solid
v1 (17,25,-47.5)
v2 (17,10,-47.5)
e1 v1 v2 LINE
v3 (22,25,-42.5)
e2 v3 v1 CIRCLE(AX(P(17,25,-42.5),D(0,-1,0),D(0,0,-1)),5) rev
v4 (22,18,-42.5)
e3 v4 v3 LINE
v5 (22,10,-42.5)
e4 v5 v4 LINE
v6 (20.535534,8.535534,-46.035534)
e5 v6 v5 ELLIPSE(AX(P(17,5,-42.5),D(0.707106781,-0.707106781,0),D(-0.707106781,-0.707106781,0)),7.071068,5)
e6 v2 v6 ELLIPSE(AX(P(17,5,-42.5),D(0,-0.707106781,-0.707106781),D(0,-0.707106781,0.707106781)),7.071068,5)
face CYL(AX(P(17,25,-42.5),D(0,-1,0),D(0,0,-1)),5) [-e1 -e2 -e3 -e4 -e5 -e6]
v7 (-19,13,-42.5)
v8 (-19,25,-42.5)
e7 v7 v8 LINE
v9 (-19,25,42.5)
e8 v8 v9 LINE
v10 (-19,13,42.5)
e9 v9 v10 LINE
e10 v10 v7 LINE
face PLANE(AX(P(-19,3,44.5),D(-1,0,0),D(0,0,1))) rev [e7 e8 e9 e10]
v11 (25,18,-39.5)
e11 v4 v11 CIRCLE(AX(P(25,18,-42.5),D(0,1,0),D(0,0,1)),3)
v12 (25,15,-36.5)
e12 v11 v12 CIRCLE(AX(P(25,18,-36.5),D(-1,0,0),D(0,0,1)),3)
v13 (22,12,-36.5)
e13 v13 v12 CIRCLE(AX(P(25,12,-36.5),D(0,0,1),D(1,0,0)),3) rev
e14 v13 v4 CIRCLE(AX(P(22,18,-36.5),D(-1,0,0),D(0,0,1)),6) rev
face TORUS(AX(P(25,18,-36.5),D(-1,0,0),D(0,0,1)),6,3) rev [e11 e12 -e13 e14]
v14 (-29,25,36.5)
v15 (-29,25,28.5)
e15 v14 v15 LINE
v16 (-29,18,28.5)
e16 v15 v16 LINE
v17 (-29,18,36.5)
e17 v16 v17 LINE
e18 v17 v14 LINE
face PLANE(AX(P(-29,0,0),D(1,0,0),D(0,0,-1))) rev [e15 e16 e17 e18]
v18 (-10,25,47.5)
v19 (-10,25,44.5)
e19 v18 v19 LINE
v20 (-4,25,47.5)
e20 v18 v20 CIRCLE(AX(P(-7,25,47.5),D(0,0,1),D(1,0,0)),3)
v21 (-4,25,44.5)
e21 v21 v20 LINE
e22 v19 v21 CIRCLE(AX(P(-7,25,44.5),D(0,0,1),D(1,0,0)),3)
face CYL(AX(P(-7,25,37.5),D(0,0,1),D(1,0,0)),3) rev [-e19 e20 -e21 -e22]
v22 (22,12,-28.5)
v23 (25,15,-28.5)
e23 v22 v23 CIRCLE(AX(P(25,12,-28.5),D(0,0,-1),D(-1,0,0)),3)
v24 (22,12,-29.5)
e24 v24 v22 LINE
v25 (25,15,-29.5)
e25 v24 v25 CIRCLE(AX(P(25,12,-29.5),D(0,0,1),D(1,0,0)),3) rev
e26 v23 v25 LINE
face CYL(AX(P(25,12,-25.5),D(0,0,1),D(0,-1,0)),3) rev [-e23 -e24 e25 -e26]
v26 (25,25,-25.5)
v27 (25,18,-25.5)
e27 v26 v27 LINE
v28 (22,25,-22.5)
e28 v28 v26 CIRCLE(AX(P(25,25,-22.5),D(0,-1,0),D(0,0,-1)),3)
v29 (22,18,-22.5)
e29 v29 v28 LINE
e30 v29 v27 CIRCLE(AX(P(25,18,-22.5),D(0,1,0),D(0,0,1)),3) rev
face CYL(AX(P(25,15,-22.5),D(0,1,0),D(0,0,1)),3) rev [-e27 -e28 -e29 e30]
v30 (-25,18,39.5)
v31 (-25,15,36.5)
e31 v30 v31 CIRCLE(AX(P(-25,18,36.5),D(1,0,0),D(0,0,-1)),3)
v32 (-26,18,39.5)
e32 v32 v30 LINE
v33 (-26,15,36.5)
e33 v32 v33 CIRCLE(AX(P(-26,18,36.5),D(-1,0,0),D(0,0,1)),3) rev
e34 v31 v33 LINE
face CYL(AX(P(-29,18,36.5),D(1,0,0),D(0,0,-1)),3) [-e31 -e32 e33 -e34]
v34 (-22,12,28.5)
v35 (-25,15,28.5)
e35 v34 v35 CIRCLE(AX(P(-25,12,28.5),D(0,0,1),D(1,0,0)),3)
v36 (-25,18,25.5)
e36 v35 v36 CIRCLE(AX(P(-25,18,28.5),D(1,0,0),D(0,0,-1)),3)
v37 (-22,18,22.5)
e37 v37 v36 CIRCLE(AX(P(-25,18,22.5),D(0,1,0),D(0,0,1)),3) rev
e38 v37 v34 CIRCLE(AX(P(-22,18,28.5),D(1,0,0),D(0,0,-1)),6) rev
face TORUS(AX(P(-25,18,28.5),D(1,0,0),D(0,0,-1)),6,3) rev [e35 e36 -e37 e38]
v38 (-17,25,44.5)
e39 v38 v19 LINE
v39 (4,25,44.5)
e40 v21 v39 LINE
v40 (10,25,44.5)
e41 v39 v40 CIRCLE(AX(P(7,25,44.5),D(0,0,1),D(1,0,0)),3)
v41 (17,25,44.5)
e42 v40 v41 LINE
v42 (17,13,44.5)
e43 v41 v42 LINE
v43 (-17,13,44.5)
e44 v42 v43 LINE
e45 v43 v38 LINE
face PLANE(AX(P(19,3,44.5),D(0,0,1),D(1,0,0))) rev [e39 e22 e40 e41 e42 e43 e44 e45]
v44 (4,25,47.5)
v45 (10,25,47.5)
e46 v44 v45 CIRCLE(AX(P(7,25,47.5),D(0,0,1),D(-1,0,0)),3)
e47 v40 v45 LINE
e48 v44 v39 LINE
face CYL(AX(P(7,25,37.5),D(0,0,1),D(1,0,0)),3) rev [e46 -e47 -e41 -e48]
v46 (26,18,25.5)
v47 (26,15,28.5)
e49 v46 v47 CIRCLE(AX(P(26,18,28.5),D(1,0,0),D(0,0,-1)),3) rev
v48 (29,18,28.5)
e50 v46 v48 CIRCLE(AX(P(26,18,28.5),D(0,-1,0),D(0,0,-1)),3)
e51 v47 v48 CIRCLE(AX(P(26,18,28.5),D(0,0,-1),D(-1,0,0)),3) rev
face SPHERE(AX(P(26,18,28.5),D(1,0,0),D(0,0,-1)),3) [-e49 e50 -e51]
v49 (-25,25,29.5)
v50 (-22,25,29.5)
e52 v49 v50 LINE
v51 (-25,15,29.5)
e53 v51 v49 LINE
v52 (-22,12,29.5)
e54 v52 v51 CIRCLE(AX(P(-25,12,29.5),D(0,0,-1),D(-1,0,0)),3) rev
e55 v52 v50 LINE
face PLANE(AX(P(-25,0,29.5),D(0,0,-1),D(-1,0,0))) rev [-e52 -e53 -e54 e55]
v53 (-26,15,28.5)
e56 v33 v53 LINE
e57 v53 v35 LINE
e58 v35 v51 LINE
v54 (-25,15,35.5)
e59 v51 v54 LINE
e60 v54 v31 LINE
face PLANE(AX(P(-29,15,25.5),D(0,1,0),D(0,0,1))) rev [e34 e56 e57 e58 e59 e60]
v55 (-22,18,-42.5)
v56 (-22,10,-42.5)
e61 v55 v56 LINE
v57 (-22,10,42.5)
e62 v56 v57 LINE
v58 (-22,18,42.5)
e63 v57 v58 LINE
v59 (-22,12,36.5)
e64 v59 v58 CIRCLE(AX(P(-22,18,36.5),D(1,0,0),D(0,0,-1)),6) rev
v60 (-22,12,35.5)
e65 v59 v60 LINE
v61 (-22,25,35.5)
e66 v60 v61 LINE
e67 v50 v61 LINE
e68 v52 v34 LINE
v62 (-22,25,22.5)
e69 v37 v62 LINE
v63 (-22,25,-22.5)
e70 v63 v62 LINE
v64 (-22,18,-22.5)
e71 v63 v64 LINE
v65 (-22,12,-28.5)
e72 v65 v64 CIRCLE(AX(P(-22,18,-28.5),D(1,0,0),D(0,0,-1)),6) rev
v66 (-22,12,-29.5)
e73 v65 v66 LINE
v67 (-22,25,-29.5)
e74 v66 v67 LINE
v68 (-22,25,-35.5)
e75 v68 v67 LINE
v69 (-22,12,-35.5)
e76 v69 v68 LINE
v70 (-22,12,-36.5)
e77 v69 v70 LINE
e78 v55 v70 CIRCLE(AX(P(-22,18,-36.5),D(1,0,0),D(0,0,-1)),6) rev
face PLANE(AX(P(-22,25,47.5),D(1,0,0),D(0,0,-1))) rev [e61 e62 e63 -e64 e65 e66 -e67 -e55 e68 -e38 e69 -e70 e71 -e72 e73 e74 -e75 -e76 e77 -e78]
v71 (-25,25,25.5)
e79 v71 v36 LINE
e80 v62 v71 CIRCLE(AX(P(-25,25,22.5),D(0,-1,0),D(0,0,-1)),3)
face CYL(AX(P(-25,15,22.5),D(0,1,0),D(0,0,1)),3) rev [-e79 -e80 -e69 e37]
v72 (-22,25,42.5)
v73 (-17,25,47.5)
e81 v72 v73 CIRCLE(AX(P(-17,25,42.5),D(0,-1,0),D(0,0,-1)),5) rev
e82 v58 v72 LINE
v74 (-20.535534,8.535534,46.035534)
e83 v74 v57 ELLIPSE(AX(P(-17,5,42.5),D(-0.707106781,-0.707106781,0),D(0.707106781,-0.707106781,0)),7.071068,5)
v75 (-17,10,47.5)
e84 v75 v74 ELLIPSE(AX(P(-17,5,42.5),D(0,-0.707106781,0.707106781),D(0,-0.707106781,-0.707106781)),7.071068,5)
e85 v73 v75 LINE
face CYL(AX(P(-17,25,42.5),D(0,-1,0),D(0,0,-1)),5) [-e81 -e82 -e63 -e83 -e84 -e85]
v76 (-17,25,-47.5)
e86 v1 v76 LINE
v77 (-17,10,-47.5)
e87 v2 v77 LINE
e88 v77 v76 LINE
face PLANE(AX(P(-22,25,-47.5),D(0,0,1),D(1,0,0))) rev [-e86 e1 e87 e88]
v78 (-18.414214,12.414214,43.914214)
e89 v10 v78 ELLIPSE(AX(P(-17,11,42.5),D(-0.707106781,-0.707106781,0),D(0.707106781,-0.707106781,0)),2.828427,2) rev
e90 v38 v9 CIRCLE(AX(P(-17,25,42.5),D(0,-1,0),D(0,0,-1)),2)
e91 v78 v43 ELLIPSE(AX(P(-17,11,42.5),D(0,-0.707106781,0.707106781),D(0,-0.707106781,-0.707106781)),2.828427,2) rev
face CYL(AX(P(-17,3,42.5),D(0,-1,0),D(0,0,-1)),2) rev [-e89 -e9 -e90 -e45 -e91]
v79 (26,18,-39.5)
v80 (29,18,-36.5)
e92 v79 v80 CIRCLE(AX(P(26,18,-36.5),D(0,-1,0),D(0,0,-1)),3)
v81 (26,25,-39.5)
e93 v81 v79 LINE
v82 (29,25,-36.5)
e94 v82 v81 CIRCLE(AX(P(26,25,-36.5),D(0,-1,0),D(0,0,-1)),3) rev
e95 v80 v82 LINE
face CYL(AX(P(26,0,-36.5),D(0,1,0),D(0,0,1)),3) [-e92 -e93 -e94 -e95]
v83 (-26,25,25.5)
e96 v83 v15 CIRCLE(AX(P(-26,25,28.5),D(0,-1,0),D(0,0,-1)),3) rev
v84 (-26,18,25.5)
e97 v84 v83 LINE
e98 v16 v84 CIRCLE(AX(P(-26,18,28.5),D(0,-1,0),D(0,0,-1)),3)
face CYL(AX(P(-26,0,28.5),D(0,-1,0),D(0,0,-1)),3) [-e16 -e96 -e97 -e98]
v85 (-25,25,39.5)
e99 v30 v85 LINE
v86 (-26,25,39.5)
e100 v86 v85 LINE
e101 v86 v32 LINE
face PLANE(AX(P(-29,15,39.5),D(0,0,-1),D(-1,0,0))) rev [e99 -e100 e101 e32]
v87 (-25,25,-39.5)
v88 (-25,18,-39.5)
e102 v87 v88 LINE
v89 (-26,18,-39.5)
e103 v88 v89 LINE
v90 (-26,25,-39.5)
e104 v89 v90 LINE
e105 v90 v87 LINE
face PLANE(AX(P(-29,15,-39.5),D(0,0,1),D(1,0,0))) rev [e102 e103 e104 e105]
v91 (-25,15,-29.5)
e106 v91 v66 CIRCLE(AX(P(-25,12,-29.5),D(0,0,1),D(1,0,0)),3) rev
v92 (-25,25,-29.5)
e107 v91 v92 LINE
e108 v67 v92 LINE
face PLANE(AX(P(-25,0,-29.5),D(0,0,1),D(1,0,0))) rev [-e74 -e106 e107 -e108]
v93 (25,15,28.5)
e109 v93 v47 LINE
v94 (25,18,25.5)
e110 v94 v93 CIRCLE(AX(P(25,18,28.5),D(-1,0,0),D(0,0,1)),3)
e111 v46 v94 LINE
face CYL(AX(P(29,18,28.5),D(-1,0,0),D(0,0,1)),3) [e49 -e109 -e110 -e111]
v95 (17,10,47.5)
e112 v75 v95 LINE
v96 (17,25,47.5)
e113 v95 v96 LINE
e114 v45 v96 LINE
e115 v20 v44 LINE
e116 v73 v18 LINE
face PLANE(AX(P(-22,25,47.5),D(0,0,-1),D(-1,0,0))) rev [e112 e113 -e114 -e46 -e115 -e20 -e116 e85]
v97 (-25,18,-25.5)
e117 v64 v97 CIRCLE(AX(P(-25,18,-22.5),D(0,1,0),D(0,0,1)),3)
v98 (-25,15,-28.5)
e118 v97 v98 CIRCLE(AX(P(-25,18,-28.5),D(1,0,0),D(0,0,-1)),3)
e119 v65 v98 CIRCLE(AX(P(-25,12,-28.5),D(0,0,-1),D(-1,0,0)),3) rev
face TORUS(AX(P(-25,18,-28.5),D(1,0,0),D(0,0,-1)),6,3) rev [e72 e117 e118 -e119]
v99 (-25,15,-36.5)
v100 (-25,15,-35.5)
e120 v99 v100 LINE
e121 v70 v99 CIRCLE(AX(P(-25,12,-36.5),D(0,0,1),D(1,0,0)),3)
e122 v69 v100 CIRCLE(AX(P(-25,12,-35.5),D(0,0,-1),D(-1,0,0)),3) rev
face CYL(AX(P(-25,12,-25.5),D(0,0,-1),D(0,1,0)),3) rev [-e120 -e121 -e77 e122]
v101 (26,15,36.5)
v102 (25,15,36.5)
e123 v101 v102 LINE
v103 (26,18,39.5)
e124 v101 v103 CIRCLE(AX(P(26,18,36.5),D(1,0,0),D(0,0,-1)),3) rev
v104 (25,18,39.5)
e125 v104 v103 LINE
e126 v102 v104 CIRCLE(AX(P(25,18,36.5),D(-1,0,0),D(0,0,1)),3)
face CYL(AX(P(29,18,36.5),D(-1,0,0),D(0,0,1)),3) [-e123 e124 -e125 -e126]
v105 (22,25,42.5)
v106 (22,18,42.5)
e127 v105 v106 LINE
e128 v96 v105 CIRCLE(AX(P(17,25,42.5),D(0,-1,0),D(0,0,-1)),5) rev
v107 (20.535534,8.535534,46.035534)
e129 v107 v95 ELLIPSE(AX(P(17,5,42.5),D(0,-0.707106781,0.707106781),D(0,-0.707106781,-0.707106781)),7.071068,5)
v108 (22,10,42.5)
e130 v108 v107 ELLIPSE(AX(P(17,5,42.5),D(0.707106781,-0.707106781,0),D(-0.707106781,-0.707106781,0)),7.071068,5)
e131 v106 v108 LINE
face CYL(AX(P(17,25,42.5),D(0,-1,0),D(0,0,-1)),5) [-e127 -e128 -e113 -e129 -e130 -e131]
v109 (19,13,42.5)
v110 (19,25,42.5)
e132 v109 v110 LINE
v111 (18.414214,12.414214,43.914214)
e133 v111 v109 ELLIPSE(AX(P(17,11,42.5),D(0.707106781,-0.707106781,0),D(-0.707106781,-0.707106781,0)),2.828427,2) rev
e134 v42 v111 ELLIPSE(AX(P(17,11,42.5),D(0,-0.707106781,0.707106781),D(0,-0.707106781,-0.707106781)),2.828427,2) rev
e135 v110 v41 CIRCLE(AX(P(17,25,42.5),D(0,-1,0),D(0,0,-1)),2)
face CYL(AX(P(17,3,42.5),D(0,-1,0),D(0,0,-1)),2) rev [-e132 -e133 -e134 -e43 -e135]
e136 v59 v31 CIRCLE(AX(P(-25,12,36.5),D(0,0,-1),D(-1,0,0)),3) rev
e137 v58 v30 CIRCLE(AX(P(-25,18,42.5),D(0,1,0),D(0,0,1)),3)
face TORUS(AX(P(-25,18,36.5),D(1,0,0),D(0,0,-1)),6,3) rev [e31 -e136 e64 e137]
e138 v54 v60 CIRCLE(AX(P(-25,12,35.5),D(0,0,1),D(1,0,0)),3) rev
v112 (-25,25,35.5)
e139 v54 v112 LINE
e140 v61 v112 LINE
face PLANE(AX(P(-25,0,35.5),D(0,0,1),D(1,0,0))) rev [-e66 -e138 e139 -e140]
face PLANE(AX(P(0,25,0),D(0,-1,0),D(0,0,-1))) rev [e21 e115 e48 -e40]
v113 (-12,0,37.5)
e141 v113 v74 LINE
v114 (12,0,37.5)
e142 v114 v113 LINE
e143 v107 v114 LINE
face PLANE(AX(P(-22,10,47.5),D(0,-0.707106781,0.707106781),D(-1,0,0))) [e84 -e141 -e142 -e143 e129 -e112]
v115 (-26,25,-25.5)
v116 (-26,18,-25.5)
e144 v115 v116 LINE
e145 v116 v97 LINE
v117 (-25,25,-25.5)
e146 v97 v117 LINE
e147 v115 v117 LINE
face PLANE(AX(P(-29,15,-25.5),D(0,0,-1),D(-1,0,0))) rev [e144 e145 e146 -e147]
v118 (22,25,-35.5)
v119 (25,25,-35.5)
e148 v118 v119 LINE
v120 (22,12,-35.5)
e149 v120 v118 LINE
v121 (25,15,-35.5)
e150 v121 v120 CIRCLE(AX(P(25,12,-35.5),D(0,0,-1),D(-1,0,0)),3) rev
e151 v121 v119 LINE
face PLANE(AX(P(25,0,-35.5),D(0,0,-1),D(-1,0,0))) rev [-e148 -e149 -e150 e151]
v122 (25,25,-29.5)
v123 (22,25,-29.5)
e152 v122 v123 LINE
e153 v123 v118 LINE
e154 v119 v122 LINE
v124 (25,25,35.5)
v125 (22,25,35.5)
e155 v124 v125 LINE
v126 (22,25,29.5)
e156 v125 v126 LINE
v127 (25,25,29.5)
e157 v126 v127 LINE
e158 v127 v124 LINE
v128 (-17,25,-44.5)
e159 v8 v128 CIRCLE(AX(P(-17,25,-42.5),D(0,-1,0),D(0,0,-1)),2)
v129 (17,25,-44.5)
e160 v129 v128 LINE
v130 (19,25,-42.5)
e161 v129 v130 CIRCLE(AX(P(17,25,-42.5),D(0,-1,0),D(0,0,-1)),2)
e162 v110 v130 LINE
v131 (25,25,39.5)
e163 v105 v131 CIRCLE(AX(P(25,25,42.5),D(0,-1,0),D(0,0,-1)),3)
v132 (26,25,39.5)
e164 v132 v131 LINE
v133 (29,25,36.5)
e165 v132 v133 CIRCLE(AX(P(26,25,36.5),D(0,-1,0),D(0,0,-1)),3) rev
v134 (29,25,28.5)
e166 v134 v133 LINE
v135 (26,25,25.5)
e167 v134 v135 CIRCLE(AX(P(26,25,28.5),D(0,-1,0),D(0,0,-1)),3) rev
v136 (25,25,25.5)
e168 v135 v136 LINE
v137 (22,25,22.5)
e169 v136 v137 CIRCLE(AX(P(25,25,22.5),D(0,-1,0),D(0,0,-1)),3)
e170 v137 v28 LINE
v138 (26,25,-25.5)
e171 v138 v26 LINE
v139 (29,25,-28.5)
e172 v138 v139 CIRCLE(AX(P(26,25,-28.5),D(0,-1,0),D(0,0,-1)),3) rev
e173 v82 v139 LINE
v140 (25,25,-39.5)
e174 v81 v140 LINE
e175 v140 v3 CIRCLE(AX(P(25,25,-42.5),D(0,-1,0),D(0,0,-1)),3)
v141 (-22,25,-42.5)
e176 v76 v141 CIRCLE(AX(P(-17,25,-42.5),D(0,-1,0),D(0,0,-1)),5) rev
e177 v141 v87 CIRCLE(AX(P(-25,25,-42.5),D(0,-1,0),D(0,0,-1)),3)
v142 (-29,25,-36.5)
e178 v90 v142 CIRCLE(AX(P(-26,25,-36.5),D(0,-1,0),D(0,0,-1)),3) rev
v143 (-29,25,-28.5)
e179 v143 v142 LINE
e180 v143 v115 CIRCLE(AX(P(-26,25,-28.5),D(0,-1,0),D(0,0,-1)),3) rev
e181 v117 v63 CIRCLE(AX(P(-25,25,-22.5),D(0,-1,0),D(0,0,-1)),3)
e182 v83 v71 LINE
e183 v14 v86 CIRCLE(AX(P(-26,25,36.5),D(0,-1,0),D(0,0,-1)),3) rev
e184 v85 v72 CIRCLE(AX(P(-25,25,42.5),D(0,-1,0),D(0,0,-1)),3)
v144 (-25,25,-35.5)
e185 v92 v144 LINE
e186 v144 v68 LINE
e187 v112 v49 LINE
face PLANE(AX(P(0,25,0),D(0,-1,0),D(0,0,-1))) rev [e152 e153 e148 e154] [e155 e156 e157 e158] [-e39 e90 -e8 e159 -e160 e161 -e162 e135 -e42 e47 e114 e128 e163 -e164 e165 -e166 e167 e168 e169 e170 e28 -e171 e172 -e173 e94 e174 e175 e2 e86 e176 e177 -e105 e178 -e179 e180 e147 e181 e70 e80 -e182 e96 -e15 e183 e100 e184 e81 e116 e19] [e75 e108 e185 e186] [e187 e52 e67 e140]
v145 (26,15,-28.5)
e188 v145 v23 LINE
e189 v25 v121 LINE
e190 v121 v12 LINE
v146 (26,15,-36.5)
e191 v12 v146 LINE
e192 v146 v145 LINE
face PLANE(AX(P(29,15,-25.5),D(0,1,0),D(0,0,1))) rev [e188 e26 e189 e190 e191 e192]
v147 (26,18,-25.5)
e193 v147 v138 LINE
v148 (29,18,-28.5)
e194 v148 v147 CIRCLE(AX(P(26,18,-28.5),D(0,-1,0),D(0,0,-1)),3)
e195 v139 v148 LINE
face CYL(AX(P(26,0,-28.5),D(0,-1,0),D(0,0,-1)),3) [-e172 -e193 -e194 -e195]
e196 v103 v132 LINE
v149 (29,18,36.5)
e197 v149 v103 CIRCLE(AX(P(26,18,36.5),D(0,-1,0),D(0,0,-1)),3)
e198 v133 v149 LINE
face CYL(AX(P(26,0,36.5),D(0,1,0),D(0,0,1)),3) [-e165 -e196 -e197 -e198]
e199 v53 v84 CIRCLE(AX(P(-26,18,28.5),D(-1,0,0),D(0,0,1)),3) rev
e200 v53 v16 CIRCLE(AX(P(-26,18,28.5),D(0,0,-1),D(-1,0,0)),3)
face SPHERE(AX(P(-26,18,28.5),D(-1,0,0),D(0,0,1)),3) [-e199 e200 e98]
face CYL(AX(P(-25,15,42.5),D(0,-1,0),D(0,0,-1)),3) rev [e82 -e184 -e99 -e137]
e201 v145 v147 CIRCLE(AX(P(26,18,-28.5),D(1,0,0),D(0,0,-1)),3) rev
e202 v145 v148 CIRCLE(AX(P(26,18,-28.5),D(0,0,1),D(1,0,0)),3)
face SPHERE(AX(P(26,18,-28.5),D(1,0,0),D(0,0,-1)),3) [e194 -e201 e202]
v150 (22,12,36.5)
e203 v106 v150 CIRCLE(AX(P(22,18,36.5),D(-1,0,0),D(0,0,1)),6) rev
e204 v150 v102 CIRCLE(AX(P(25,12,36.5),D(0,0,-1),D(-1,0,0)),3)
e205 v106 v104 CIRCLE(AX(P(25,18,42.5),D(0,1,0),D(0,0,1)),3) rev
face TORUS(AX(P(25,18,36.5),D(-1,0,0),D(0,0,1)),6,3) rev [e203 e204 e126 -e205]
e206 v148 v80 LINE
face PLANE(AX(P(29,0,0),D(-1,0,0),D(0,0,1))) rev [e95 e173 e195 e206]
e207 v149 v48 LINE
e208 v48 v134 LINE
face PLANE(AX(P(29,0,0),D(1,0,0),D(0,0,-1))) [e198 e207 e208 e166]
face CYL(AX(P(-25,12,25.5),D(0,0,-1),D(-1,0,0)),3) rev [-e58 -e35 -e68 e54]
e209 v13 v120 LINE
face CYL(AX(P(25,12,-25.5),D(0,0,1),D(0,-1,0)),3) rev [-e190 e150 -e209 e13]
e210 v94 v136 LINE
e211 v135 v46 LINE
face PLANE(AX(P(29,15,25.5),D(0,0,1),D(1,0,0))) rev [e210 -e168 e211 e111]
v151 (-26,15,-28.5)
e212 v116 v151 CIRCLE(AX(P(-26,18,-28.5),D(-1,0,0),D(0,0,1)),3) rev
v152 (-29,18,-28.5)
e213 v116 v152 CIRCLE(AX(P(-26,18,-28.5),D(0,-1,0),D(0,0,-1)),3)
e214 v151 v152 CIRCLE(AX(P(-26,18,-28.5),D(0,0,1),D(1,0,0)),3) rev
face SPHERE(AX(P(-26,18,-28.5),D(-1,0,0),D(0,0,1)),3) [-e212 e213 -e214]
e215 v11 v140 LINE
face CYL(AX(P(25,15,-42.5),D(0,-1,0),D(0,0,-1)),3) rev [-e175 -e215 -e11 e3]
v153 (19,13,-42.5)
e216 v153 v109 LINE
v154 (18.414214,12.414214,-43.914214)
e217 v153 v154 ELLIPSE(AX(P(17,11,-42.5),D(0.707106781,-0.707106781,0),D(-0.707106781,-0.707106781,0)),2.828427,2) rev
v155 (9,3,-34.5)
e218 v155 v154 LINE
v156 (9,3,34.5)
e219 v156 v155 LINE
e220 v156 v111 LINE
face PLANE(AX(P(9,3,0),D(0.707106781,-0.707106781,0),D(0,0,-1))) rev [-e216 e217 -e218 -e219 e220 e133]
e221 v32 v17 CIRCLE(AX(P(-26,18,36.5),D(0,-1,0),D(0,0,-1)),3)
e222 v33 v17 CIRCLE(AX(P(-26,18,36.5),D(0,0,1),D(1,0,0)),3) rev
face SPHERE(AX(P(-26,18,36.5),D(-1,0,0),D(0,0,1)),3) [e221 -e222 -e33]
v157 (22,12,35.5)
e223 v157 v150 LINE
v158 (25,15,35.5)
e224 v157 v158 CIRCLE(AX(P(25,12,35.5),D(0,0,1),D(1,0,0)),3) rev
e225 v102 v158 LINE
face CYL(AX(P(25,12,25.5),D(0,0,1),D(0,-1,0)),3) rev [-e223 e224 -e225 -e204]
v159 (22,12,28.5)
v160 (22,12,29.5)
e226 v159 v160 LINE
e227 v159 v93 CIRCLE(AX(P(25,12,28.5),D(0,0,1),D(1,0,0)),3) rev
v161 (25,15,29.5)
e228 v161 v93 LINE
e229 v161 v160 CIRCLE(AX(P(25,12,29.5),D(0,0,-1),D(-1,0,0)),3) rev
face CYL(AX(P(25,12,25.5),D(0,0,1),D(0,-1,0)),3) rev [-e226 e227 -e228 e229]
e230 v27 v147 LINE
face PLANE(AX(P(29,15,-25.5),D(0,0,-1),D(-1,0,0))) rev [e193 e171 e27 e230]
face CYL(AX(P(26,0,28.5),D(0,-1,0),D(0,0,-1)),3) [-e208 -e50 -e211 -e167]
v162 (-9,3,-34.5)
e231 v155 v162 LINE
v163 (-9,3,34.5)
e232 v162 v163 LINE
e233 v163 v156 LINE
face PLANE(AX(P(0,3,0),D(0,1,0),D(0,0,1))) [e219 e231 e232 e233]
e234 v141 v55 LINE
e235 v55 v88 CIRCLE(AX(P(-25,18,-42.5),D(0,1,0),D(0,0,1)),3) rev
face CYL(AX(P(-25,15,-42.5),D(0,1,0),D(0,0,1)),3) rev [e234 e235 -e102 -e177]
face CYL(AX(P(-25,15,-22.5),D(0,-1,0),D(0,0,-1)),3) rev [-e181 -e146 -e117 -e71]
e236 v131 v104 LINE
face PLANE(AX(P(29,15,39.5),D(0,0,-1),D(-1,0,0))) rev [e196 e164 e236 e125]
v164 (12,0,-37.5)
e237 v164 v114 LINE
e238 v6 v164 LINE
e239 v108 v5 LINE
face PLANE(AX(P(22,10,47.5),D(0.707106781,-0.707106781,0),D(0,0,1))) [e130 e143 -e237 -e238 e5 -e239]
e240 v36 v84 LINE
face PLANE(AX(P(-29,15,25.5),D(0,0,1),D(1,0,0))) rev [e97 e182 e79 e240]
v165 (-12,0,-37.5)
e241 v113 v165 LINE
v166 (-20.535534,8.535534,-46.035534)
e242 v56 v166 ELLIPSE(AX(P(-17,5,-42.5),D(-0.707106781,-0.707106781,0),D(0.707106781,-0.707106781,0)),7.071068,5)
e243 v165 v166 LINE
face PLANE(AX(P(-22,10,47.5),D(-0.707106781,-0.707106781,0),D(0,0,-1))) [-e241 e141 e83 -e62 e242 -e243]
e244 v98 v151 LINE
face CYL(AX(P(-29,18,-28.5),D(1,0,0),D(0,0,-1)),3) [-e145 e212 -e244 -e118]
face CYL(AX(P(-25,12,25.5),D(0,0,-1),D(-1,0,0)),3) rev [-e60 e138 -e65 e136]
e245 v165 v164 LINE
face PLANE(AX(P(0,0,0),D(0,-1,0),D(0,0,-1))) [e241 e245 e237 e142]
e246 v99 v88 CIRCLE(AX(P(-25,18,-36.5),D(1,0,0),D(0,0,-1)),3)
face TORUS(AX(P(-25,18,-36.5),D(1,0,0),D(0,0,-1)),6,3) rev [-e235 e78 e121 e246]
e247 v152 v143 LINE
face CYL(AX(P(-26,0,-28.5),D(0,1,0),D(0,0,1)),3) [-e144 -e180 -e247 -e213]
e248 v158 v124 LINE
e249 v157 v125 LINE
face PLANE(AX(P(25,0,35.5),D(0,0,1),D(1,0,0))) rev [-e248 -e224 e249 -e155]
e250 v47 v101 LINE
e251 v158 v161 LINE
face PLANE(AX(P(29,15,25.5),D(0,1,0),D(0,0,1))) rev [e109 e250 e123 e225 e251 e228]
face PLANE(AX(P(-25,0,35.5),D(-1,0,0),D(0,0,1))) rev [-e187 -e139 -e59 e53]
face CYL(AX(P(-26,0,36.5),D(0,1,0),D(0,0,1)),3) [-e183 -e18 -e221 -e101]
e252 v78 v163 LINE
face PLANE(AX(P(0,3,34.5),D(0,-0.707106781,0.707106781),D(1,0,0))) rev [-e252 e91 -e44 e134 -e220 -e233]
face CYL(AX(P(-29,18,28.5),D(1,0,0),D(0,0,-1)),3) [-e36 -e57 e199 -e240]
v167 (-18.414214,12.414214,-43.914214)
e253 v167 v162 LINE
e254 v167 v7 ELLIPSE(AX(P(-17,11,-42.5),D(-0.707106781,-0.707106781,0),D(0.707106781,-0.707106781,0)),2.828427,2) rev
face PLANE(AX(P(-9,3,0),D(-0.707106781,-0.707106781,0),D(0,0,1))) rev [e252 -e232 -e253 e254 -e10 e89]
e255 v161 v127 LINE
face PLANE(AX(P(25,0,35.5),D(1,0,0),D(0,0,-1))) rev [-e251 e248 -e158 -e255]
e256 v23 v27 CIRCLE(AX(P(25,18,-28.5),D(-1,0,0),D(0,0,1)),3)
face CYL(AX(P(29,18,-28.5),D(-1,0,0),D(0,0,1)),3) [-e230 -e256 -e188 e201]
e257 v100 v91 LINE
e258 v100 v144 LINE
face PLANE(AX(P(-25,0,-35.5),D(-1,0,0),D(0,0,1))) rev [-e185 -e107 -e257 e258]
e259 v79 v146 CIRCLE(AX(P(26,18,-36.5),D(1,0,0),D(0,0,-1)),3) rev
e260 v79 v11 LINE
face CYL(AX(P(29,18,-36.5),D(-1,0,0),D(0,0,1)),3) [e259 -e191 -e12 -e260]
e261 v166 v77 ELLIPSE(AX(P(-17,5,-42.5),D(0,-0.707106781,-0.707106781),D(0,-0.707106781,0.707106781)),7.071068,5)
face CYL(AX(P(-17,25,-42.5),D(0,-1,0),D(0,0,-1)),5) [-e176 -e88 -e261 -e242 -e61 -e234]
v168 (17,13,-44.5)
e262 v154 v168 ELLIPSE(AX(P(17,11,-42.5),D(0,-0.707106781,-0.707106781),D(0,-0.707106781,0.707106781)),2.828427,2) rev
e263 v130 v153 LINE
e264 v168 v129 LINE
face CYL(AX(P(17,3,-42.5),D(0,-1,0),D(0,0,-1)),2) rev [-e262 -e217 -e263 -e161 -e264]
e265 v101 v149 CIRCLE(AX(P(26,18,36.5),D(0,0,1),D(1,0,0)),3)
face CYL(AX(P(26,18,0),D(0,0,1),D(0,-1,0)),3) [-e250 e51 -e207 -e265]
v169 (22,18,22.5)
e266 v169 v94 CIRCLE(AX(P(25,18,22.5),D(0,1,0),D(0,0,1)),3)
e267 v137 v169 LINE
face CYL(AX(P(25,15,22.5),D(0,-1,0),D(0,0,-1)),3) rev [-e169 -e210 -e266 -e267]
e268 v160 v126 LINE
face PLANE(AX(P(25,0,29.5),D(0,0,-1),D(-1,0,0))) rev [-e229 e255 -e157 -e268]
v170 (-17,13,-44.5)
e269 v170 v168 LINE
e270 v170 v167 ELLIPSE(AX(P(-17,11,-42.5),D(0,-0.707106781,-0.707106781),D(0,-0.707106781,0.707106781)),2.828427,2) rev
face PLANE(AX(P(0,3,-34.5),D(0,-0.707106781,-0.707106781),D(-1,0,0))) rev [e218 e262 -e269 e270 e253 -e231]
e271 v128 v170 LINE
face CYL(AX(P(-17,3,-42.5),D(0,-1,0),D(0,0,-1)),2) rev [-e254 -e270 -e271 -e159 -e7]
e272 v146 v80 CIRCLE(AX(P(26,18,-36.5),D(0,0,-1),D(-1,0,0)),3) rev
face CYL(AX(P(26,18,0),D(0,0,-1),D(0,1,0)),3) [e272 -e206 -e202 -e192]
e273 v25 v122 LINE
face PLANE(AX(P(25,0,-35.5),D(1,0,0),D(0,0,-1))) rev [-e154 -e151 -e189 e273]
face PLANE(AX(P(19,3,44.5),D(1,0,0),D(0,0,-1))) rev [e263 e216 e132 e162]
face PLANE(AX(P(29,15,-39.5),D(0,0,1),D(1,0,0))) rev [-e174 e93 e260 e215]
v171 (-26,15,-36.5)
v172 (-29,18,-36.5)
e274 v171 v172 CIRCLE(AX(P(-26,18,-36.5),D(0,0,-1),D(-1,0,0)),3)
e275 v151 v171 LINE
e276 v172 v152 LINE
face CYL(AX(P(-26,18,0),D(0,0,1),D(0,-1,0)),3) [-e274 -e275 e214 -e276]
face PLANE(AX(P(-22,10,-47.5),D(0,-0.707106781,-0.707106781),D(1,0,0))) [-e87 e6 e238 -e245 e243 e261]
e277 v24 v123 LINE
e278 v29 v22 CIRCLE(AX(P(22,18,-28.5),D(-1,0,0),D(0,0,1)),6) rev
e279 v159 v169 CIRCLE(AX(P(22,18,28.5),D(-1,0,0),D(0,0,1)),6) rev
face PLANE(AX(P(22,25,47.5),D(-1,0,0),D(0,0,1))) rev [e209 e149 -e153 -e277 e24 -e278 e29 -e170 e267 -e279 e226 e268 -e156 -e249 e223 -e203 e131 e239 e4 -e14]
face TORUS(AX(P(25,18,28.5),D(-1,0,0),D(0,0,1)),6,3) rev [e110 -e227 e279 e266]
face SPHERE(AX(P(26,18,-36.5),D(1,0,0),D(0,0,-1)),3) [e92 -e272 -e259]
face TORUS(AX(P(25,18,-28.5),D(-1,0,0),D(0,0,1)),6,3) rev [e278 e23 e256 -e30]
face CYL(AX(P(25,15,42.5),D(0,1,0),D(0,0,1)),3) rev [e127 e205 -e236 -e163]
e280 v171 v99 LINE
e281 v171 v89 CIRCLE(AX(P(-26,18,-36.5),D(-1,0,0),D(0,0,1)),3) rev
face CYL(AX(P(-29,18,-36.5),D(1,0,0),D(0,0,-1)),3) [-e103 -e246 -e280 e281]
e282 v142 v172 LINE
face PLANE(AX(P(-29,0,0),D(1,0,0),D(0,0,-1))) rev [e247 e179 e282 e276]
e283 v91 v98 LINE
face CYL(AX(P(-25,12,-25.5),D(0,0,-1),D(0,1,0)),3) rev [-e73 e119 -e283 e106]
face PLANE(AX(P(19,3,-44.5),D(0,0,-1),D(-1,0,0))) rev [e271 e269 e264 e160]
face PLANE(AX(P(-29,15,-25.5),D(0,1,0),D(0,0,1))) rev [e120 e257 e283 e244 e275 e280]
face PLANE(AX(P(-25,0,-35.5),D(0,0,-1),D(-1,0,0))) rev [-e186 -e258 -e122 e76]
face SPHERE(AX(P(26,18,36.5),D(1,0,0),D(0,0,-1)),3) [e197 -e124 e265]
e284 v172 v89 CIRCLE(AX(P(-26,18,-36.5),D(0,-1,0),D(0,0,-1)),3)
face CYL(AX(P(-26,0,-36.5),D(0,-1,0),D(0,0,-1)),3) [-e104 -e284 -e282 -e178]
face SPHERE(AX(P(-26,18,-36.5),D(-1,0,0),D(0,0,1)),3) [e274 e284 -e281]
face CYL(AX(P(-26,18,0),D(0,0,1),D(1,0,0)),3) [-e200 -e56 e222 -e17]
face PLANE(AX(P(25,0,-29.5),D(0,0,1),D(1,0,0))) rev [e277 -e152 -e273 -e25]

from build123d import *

# Parameters (mm, degrees)
SKETCH1_W               = 44
SKETCH1_H               = 95
BOSS_EXTRUDE1_DEPTH     = 25
SKETCH2_W               = 38
SKETCH2_H               = 89
CUT_EXTRUDE1_DEPTH      = 22
CHAMFER1_SIZE           = 10
FILLET1_R               = 2
FILLET2_R               = 5
SKETCH3_W               = 14
SKETCH3_H               = 10
BOSS_EXTRUDE2_DEPTH     = 7
SKETCH5_W               = 14
SKETCH5_H               = 10
BOSS_EXTRUDE3_DEPTH     = 7
FILLET3_R               = 3
CUT_EXTRUDE2_DEPTH      = 62.010245041
CUT_EXTRUDE2_DEPTH_BACK = 62.010245041
SKETCH7_W               = 3
SKETCH7_H               = 6
SKETCH8_R               = 3
CUT_EXTRUDE3_DEPTH      = 10


with BuildPart() as part:
    # Sketch1 → Boss-Extrude1 (new body)
    with BuildSketch(Plane(origin=(0, 0, 0), x_dir=(1, 0, 0), z_dir=(0, 1, 0))):
        Rectangle(SKETCH1_W, SKETCH1_H)
    extrude(amount=BOSS_EXTRUDE1_DEPTH)

    # Sketch2 → Cut-Extrude1 (cut)
    with BuildSketch(Plane(origin=(0, 25, 0), x_dir=(1, 0, 0), z_dir=(0, 1, 0))):
        Rectangle(SKETCH2_W, SKETCH2_H)
    extrude(amount=-CUT_EXTRUDE1_DEPTH, mode=Mode.SUBTRACT)

    # Chamfer1
    chamfer1_edges = [part.edges().sort_by_distance(p)[0] for p in [
        (-19, 3, 0),
        (0, 3, -44.5),
        (19, 3, 0),
        (0, 3, 44.5),
        (0, 0, 47.5),
        (-22, 0, 0),
        (0, 0, -47.5),
        (22, 0, 0),
    ]]
    chamfer(chamfer1_edges, length=CHAMFER1_SIZE)

    # Fillet1
    fillet1_edges = [part.edges().sort_by_distance(p)[0] for p in [
        (-19, 19, -44.5),
        (19, 19, -44.5),
        (19, 19, 44.5),
        (-19, 19, 44.5),
    ]]
    fillet(fillet1_edges, radius=FILLET1_R)

    # Fillet2
    fillet2_edges = [part.edges().sort_by_distance(p)[0] for p in [
        (22, 17.5, 47.5),
        (-22, 17.5, 47.5),
        (-22, 17.5, -47.5),
        (22, 17.5, -47.5),
    ]]
    fillet(fillet2_edges, radius=FILLET2_R)

    # Sketch3 → Boss-Extrude2 (add)
    with BuildSketch(Plane(origin=(22, 0, 0), x_dir=(0, 0, -1), z_dir=(1, 0, 0))):
        with Locations((-32.5, 20)):
            Rectangle(SKETCH3_W, SKETCH3_H)
        with Locations((32.5, 20)):
            Rectangle(SKETCH3_W, SKETCH3_H)
    extrude(amount=BOSS_EXTRUDE2_DEPTH)

    # Sketch5 → Boss-Extrude3 (add)
    with BuildSketch(Plane.ZY.offset(22)):
        with Locations((32.5, 20)):
            Rectangle(SKETCH5_W, SKETCH5_H)
        with Locations((-32.5, 20)):
            Rectangle(SKETCH5_W, SKETCH5_H)
    extrude(amount=BOSS_EXTRUDE3_DEPTH)

    # Fillet3
    fillet3_edges = [part.edges().sort_by_distance(p)[0] for p in [
        (22, 20, 39.5),
        (22, 15, 32.5),
        (25.5, 15, 39.5),
        (22, 20, 25.5),
        (25.5, 15, 25.5),
        (29, 20, 39.5),
        (29, 15, 32.5),
        (29, 20, 25.5),
        (22, 20, -25.5),
        (22, 15, -32.5),
        (25.5, 15, -25.5),
        (22, 20, -39.5),
        (25.5, 15, -39.5),
        (29, 20, -25.5),
        (29, 15, -32.5),
        (29, 20, -39.5),
        (-22, 20, 39.5),
        (-25.5, 15, 39.5),
        (-22, 20, 25.5),
        (-22, 15, 32.5),
        (-25.5, 15, 25.5),
        (-29, 20, 39.5),
        (-29, 20, 25.5),
        (-29, 15, 32.5),
        (-22, 15, -32.5),
        (-25.5, 15, -39.5),
        (-22, 20, -25.5),
        (-25.5, 15, -25.5),
        (-22, 20, -39.5),
        (-29, 15, -32.5),
        (-29, 20, -25.5),
        (-29, 20, -39.5),
    ]]
    fillet(fillet3_edges, radius=FILLET3_R - 0.0001)  # a hair under: the kernel refuses the full size

    # Sketch7 → Cut-Extrude2 (cut, two sides: drawn at the far end of the back side and taken through both)
    with BuildSketch(Plane(origin=(0, 25, 0), x_dir=(1, 0, 0), z_dir=(0, 1, 0)).offset(-CUT_EXTRUDE2_DEPTH_BACK)):
        with Locations((-23.5, 32.5)):
            Rectangle(SKETCH7_W, SKETCH7_H)
        with Locations((23.5, 32.5)):
            Rectangle(SKETCH7_W, SKETCH7_H)
        with Locations((23.5, -32.5)):
            Rectangle(SKETCH7_W, SKETCH7_H)
        with Locations((-23.5, -32.5)):
            Rectangle(SKETCH7_W, SKETCH7_H)
    extrude(amount=CUT_EXTRUDE2_DEPTH + CUT_EXTRUDE2_DEPTH_BACK, mode=Mode.SUBTRACT)

    # Sketch8 → Cut-Extrude3 (cut)
    with BuildSketch(Plane.XY.offset(47.5)):
        with Locations((7, 25)):
            Circle(SKETCH8_R)
        with Locations((-7, 25)):
            Circle(SKETCH8_R)
    extrude(amount=-CUT_EXTRUDE3_DEPTH, mode=Mode.SUBTRACT)


solid = part.part
